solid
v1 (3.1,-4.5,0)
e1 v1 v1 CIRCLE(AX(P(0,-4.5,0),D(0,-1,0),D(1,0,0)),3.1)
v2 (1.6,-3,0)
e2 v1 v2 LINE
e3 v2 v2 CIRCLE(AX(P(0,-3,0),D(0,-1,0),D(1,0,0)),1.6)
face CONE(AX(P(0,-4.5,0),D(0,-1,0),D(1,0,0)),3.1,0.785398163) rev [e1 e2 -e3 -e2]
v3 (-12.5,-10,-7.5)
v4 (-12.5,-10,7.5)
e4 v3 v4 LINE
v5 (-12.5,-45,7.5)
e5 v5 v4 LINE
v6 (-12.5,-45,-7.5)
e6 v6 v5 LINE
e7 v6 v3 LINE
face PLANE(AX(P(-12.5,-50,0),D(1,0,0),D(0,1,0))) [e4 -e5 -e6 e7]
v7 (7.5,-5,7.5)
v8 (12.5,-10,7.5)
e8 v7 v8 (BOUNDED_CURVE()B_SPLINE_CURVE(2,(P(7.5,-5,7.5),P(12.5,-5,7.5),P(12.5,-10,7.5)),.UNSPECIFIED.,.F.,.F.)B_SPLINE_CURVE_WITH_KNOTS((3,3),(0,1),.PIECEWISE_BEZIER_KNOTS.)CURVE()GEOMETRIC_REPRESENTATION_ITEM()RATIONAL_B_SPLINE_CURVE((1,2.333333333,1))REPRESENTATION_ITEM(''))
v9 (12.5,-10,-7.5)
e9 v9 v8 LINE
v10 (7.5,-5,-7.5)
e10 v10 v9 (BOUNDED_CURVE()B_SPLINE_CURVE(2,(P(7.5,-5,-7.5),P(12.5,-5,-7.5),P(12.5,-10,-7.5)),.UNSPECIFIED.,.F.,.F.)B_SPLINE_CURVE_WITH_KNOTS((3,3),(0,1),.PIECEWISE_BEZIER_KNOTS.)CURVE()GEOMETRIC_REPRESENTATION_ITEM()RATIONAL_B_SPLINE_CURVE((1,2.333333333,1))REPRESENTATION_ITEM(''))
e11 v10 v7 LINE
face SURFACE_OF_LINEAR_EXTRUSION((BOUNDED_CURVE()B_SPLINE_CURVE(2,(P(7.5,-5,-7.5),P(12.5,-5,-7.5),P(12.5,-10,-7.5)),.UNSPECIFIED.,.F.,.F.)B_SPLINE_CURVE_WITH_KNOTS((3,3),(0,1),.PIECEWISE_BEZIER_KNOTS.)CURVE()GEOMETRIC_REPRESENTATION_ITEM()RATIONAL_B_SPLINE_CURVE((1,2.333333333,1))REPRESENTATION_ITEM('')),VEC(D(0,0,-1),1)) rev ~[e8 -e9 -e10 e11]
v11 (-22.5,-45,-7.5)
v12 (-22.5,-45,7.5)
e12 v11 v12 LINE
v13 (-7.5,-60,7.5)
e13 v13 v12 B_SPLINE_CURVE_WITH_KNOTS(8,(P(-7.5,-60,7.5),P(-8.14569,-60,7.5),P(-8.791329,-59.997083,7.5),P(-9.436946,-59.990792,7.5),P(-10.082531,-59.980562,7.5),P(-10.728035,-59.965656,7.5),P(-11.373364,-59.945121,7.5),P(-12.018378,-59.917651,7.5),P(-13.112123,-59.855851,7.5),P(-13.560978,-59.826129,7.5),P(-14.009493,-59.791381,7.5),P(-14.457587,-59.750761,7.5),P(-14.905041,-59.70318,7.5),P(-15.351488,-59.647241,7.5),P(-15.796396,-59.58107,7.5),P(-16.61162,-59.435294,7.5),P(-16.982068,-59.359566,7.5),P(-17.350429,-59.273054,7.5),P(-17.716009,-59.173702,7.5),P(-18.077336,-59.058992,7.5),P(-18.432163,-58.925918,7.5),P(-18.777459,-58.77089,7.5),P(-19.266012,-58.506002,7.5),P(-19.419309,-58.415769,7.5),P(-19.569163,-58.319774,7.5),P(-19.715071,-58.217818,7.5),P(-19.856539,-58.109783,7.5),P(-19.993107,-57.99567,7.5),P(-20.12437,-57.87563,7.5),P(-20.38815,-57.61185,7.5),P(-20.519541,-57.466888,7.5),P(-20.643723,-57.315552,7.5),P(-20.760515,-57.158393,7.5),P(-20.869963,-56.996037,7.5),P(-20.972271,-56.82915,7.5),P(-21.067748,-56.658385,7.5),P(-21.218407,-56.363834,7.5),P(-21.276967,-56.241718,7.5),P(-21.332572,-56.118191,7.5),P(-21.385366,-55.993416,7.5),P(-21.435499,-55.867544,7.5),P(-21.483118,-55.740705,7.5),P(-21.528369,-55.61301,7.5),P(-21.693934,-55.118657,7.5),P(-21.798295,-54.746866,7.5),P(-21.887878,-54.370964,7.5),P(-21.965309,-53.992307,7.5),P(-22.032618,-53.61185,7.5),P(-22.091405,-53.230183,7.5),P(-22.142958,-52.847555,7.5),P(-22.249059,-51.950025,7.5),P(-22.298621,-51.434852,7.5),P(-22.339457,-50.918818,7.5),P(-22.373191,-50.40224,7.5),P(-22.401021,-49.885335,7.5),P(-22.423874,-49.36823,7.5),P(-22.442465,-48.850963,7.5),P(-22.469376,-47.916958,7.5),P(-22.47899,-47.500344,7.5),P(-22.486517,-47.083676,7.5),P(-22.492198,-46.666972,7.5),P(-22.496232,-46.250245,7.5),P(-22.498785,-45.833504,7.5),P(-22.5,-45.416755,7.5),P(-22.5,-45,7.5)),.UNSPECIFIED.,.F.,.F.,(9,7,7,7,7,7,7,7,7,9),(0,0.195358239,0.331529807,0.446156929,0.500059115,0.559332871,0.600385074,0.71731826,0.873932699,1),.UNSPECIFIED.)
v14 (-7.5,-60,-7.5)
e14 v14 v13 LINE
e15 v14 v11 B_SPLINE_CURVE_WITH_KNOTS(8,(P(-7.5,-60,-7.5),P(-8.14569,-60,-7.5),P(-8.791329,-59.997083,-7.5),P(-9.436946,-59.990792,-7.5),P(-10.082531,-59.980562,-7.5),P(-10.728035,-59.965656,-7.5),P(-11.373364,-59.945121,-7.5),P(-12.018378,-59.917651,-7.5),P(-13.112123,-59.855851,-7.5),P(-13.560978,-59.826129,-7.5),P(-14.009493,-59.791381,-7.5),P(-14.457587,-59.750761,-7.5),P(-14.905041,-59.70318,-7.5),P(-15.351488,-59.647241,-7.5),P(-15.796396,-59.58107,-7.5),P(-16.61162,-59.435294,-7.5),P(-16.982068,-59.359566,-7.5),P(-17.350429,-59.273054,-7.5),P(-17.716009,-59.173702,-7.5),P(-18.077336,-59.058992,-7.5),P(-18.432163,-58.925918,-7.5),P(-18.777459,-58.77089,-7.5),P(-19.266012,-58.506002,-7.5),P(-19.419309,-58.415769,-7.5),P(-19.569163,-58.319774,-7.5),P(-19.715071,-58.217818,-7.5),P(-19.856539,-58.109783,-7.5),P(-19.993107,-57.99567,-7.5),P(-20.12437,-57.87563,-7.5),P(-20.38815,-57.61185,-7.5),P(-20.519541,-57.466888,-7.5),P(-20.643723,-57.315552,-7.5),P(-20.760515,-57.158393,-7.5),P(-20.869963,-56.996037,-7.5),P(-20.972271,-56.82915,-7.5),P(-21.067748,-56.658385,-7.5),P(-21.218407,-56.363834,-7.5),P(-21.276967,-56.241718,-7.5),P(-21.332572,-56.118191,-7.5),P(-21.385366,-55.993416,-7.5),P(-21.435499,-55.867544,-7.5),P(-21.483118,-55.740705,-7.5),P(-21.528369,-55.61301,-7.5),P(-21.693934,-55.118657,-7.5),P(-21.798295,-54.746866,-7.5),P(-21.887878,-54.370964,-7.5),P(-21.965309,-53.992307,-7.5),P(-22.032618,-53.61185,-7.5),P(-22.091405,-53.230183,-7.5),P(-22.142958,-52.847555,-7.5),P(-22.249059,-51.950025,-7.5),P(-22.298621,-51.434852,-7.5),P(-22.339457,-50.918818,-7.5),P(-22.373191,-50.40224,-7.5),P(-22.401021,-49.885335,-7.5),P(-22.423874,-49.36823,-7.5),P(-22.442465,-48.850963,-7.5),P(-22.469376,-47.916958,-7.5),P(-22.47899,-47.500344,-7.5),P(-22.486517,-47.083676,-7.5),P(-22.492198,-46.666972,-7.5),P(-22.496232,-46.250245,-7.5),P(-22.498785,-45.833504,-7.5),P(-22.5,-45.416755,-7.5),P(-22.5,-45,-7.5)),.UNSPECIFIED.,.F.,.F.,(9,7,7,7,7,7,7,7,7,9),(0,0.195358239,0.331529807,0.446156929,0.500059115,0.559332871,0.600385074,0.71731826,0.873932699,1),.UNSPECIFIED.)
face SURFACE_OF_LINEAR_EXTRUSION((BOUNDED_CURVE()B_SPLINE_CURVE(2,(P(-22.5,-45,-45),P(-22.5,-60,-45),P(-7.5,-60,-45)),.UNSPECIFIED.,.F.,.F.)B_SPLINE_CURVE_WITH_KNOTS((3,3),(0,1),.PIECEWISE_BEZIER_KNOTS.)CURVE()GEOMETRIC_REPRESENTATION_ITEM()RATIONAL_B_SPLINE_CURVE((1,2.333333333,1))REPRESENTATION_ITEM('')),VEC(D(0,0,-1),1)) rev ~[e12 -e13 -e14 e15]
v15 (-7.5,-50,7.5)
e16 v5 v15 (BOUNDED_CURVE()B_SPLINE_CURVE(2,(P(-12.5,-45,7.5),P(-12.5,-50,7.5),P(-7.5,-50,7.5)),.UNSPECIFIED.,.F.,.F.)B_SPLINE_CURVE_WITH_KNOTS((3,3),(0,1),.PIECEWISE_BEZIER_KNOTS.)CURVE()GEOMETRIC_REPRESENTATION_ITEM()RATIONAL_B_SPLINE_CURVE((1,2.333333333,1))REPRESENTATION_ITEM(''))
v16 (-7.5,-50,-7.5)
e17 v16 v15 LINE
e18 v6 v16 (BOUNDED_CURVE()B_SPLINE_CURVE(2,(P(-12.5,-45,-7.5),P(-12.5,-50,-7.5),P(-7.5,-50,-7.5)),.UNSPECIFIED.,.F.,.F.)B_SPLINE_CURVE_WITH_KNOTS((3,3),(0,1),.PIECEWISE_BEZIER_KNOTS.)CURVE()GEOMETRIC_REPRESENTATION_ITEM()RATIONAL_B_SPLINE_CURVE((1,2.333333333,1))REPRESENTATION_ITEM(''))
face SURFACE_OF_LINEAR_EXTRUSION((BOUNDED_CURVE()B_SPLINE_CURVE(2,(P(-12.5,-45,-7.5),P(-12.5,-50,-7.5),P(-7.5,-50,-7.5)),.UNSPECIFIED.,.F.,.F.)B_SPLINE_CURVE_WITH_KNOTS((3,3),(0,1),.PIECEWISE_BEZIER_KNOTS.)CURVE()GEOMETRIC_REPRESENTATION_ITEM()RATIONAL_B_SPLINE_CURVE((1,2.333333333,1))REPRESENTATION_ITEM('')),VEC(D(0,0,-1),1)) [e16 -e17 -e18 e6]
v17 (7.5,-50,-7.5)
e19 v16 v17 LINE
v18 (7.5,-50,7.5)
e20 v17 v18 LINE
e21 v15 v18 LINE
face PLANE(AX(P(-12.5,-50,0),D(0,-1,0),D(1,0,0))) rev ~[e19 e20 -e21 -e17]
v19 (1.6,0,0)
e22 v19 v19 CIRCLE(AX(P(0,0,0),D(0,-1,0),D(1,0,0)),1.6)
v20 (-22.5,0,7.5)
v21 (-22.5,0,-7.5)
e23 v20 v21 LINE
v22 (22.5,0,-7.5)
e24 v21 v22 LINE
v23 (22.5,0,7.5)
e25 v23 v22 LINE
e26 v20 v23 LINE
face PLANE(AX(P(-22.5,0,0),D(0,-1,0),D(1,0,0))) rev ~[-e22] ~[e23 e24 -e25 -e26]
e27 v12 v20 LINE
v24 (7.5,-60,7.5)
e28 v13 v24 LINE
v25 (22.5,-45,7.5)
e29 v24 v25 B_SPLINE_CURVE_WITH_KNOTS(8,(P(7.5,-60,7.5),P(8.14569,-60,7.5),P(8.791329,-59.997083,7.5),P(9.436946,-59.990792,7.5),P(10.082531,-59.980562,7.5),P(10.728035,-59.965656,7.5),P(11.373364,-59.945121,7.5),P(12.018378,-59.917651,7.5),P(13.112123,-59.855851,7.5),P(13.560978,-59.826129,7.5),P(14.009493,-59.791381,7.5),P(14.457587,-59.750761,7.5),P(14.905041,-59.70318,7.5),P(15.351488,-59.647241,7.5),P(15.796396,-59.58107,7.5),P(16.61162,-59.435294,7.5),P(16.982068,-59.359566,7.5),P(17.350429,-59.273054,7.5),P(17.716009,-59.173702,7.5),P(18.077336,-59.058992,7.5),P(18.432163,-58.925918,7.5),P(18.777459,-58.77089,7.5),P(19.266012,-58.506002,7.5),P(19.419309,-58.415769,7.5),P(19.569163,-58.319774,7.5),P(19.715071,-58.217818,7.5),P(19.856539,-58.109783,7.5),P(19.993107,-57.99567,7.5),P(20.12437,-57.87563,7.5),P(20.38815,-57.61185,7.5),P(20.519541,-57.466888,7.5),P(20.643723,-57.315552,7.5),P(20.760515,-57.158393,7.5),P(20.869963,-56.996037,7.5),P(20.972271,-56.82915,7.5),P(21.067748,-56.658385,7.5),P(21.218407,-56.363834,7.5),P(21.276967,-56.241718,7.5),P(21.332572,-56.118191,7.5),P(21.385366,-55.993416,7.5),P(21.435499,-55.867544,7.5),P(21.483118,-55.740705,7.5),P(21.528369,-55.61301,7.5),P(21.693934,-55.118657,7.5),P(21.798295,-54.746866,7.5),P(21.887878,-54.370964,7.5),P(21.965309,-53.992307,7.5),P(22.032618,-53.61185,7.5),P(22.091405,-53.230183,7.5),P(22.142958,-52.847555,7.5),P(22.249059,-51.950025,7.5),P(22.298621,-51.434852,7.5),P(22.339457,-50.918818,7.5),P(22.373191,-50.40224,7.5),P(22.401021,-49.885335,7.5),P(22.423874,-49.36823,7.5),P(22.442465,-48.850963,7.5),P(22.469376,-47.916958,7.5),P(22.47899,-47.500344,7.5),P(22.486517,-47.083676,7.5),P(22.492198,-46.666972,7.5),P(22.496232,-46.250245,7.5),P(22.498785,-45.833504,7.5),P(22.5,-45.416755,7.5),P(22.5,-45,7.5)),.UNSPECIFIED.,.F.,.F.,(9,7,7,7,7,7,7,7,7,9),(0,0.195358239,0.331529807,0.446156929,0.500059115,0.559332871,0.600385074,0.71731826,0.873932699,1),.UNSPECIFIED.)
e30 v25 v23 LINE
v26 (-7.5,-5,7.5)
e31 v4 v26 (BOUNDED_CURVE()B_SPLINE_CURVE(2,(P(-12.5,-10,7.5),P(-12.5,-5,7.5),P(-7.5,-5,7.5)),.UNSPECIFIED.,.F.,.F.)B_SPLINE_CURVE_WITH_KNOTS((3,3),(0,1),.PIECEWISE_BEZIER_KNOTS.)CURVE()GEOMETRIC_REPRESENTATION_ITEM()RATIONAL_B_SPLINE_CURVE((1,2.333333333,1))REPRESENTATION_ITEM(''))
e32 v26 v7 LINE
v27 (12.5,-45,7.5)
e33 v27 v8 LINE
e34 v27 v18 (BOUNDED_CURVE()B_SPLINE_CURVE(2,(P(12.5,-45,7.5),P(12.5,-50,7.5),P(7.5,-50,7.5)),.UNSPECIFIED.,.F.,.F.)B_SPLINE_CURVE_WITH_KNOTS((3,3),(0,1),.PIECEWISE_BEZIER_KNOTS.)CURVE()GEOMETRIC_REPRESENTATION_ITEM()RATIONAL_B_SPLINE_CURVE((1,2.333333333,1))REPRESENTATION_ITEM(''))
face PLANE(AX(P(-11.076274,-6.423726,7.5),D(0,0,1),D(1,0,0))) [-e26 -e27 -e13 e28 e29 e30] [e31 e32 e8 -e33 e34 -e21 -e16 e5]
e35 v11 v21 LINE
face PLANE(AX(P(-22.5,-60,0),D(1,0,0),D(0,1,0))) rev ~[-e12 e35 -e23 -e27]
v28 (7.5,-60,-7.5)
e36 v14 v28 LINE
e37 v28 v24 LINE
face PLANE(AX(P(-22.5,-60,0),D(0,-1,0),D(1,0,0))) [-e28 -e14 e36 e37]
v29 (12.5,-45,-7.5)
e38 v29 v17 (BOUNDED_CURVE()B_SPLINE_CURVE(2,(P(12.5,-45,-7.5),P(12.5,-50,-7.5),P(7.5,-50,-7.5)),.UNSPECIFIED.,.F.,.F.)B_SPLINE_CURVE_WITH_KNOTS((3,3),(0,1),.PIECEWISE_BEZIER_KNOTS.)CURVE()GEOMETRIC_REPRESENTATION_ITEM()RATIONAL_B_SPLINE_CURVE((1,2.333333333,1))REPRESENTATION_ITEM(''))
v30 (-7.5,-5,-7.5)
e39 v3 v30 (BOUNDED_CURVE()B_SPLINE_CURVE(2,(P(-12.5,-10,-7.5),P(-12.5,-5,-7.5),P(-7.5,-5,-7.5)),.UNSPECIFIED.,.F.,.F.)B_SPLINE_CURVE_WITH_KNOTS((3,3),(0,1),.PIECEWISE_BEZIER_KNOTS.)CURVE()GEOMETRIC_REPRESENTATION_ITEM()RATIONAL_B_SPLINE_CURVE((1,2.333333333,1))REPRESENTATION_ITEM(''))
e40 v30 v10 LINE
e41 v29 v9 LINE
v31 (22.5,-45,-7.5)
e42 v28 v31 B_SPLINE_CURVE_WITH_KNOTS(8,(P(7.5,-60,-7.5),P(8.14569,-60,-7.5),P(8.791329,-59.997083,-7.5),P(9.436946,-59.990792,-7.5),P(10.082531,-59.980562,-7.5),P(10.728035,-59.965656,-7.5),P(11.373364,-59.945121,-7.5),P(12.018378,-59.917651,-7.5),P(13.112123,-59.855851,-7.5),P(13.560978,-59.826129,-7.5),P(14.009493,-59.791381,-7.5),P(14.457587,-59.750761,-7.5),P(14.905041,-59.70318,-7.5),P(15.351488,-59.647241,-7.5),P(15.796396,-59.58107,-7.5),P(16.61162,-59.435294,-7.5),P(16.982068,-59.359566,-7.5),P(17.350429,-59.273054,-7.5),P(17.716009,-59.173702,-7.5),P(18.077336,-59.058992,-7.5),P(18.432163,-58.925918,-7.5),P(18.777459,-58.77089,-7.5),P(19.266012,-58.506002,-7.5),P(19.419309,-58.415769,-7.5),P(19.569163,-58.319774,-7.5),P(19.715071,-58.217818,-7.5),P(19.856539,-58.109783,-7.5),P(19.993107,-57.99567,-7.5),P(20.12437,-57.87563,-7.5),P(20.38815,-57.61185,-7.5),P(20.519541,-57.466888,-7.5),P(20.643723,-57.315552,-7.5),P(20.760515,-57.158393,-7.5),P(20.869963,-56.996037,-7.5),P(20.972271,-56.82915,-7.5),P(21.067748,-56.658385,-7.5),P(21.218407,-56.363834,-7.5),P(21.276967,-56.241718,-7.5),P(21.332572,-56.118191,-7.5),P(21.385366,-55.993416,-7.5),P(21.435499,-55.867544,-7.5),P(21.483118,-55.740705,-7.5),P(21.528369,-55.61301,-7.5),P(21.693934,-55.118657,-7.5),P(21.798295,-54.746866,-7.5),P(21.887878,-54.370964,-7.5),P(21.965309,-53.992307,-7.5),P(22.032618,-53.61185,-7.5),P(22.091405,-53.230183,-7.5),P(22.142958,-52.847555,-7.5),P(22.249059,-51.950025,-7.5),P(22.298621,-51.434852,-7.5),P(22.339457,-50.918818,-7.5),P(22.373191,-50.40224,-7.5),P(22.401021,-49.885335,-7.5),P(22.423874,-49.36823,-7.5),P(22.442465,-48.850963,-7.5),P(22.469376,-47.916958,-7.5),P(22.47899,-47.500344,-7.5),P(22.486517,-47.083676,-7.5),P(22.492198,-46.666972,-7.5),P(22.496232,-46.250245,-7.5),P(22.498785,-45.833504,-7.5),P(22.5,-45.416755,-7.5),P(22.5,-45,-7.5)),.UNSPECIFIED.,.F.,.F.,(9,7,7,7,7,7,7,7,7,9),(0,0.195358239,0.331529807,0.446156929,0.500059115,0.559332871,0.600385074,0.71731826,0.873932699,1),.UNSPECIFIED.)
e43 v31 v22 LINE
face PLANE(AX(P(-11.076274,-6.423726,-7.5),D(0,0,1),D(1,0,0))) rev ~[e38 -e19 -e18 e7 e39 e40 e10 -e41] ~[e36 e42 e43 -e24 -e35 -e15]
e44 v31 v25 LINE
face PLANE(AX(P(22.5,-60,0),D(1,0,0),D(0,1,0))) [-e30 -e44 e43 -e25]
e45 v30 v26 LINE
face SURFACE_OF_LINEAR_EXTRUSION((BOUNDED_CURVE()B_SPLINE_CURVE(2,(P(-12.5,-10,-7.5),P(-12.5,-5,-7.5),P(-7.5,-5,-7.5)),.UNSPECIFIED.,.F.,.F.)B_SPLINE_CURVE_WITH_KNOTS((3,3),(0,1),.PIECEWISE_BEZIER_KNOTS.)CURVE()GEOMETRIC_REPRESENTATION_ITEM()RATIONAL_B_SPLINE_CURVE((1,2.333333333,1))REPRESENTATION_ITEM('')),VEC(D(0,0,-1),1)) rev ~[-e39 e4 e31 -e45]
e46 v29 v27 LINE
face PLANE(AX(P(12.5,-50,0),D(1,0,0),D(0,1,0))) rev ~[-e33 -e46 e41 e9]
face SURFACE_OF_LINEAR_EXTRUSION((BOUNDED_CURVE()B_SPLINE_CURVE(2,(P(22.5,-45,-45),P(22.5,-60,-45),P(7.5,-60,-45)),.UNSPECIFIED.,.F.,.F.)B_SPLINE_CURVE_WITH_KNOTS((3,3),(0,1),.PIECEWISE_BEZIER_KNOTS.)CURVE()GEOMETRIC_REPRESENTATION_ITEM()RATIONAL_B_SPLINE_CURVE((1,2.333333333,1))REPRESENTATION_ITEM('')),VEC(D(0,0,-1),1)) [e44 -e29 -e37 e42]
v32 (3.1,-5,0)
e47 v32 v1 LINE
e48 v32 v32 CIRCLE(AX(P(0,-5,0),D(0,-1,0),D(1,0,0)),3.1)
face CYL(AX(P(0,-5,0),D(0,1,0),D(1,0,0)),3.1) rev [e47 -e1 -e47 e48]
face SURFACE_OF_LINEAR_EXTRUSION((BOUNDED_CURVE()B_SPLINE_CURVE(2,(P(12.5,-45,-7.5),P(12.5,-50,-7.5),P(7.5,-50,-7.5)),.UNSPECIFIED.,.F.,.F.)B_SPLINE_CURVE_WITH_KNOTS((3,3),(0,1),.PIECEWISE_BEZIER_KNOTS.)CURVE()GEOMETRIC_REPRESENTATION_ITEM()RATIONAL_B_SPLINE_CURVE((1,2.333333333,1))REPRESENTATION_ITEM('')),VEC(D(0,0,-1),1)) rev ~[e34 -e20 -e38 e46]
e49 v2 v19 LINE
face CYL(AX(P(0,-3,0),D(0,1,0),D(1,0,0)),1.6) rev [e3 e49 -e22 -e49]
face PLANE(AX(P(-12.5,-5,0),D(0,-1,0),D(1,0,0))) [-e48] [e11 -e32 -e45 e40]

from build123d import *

# Parameters (mm, degrees)
F0_W        = 45
F0_H        = 60
F0_W_2      = 25
F0_H_2      = 45
F1_DEPTH    = 7.5
F4_T1_DEPTH = 15
F5_T1_DEPTH = 90


# Not quite as in the source:
# - a fillet or chamfer that OpenCascade refuses, or shapes differently, is made with other operations: its cross-section is extruded or revolved along the edge and cut away or added


with BuildPart() as f1:
    # F0 (on Top) → F1 (new body, symmetric)
    with BuildSketch(Plane.XY):
        with Locations((0, -30)):
            Rectangle(F0_W, F0_H)
        with Locations((0, -27.5)):
            Rectangle(F0_W_2, F0_H_2, mode=Mode.SUBTRACT)
    extrude(amount=F1_DEPTH, both=True)

    # F2 (on Top) → F3 (revolve, cut)
    with BuildSketch(Plane.XY):
        Polygon((1.6, 0), (0, 0), (0, -5), (3.1, -5), (3.1, -4.5), (1.6, -3), align=None)
    revolve(axis=Axis((0, -2.5, 0), (0, -1, 0)), mode=Mode.SUBTRACT)

    # F4: fillet of radius 5 on 4 edges, made by hand

    # F4_s2 → F4_t1 (join)
    with BuildSketch(Plane.XY.offset(-7.5)):
        with BuildLine():
            add(Edge.make_bspline(
                [(-12.5, -10), (-12.5, -5), (-7.5, -5)],
                knots=[0, 0, 0, 1, 1, 1], degree=2, weights=[1, 2.3333333333, 1]))
            Line((-7.5, -5), (-12.5, -5))
            Line((-12.5, -5), (-12.5, -10))
        make_face()
        with BuildLine():
            add(Edge.make_bspline(
                [(7.5, -5), (12.5, -5), (12.5, -10)],
                knots=[0, 0, 0, 1, 1, 1], degree=2, weights=[1, 2.3333333333, 1]))
            Line((12.5, -10), (12.5, -5))
            Line((12.5, -5), (7.5, -5))
        make_face()
        with BuildLine():
            add(Edge.make_bspline(
                [(-12.5, -45), (-12.5, -50), (-7.5, -50)],
                knots=[0, 0, 0, 1, 1, 1], degree=2, weights=[1, 2.3333333333, 1]))
            Line((-7.5, -50), (-12.5, -50))
            Line((-12.5, -50), (-12.5, -45))
        make_face()
        with BuildLine():
            add(Edge.make_bspline(
                [(12.5, -45), (12.5, -50), (7.5, -50)],
                knots=[0, 0, 0, 1, 1, 1], degree=2, weights=[1, 2.3333333333, 1]))
            Line((7.5, -50), (12.5, -50))
            Line((12.5, -50), (12.5, -45))
        make_face()
    extrude(amount=F4_T1_DEPTH)

    # F5: fillet of radius 15 on 2 edges, made by hand

    # F5_s2 → F5_t1 (cut)
    with BuildSketch(Plane.XY.offset(-45)):
        with BuildLine():
            add(Edge.make_bspline(
                [(-22.5, -45), (-22.5, -60), (-7.5, -60)],
                knots=[0, 0, 0, 1, 1, 1], degree=2, weights=[1, 2.3333333333, 1]))
            Line((-7.5, -60), (-22.5, -60))
            Line((-22.5, -60), (-22.5, -45))
        make_face()
        with BuildLine():
            add(Edge.make_bspline(
                [(22.5, -45), (22.5, -60), (7.5, -60)],
                knots=[0, 0, 0, 1, 1, 1], degree=2, weights=[1, 2.3333333333, 1]))
            Line((7.5, -60), (22.5, -60))
            Line((22.5, -60), (22.5, -45))
        make_face()
    extrude(amount=F5_T1_DEPTH, mode=Mode.SUBTRACT)


solid = f1.part
